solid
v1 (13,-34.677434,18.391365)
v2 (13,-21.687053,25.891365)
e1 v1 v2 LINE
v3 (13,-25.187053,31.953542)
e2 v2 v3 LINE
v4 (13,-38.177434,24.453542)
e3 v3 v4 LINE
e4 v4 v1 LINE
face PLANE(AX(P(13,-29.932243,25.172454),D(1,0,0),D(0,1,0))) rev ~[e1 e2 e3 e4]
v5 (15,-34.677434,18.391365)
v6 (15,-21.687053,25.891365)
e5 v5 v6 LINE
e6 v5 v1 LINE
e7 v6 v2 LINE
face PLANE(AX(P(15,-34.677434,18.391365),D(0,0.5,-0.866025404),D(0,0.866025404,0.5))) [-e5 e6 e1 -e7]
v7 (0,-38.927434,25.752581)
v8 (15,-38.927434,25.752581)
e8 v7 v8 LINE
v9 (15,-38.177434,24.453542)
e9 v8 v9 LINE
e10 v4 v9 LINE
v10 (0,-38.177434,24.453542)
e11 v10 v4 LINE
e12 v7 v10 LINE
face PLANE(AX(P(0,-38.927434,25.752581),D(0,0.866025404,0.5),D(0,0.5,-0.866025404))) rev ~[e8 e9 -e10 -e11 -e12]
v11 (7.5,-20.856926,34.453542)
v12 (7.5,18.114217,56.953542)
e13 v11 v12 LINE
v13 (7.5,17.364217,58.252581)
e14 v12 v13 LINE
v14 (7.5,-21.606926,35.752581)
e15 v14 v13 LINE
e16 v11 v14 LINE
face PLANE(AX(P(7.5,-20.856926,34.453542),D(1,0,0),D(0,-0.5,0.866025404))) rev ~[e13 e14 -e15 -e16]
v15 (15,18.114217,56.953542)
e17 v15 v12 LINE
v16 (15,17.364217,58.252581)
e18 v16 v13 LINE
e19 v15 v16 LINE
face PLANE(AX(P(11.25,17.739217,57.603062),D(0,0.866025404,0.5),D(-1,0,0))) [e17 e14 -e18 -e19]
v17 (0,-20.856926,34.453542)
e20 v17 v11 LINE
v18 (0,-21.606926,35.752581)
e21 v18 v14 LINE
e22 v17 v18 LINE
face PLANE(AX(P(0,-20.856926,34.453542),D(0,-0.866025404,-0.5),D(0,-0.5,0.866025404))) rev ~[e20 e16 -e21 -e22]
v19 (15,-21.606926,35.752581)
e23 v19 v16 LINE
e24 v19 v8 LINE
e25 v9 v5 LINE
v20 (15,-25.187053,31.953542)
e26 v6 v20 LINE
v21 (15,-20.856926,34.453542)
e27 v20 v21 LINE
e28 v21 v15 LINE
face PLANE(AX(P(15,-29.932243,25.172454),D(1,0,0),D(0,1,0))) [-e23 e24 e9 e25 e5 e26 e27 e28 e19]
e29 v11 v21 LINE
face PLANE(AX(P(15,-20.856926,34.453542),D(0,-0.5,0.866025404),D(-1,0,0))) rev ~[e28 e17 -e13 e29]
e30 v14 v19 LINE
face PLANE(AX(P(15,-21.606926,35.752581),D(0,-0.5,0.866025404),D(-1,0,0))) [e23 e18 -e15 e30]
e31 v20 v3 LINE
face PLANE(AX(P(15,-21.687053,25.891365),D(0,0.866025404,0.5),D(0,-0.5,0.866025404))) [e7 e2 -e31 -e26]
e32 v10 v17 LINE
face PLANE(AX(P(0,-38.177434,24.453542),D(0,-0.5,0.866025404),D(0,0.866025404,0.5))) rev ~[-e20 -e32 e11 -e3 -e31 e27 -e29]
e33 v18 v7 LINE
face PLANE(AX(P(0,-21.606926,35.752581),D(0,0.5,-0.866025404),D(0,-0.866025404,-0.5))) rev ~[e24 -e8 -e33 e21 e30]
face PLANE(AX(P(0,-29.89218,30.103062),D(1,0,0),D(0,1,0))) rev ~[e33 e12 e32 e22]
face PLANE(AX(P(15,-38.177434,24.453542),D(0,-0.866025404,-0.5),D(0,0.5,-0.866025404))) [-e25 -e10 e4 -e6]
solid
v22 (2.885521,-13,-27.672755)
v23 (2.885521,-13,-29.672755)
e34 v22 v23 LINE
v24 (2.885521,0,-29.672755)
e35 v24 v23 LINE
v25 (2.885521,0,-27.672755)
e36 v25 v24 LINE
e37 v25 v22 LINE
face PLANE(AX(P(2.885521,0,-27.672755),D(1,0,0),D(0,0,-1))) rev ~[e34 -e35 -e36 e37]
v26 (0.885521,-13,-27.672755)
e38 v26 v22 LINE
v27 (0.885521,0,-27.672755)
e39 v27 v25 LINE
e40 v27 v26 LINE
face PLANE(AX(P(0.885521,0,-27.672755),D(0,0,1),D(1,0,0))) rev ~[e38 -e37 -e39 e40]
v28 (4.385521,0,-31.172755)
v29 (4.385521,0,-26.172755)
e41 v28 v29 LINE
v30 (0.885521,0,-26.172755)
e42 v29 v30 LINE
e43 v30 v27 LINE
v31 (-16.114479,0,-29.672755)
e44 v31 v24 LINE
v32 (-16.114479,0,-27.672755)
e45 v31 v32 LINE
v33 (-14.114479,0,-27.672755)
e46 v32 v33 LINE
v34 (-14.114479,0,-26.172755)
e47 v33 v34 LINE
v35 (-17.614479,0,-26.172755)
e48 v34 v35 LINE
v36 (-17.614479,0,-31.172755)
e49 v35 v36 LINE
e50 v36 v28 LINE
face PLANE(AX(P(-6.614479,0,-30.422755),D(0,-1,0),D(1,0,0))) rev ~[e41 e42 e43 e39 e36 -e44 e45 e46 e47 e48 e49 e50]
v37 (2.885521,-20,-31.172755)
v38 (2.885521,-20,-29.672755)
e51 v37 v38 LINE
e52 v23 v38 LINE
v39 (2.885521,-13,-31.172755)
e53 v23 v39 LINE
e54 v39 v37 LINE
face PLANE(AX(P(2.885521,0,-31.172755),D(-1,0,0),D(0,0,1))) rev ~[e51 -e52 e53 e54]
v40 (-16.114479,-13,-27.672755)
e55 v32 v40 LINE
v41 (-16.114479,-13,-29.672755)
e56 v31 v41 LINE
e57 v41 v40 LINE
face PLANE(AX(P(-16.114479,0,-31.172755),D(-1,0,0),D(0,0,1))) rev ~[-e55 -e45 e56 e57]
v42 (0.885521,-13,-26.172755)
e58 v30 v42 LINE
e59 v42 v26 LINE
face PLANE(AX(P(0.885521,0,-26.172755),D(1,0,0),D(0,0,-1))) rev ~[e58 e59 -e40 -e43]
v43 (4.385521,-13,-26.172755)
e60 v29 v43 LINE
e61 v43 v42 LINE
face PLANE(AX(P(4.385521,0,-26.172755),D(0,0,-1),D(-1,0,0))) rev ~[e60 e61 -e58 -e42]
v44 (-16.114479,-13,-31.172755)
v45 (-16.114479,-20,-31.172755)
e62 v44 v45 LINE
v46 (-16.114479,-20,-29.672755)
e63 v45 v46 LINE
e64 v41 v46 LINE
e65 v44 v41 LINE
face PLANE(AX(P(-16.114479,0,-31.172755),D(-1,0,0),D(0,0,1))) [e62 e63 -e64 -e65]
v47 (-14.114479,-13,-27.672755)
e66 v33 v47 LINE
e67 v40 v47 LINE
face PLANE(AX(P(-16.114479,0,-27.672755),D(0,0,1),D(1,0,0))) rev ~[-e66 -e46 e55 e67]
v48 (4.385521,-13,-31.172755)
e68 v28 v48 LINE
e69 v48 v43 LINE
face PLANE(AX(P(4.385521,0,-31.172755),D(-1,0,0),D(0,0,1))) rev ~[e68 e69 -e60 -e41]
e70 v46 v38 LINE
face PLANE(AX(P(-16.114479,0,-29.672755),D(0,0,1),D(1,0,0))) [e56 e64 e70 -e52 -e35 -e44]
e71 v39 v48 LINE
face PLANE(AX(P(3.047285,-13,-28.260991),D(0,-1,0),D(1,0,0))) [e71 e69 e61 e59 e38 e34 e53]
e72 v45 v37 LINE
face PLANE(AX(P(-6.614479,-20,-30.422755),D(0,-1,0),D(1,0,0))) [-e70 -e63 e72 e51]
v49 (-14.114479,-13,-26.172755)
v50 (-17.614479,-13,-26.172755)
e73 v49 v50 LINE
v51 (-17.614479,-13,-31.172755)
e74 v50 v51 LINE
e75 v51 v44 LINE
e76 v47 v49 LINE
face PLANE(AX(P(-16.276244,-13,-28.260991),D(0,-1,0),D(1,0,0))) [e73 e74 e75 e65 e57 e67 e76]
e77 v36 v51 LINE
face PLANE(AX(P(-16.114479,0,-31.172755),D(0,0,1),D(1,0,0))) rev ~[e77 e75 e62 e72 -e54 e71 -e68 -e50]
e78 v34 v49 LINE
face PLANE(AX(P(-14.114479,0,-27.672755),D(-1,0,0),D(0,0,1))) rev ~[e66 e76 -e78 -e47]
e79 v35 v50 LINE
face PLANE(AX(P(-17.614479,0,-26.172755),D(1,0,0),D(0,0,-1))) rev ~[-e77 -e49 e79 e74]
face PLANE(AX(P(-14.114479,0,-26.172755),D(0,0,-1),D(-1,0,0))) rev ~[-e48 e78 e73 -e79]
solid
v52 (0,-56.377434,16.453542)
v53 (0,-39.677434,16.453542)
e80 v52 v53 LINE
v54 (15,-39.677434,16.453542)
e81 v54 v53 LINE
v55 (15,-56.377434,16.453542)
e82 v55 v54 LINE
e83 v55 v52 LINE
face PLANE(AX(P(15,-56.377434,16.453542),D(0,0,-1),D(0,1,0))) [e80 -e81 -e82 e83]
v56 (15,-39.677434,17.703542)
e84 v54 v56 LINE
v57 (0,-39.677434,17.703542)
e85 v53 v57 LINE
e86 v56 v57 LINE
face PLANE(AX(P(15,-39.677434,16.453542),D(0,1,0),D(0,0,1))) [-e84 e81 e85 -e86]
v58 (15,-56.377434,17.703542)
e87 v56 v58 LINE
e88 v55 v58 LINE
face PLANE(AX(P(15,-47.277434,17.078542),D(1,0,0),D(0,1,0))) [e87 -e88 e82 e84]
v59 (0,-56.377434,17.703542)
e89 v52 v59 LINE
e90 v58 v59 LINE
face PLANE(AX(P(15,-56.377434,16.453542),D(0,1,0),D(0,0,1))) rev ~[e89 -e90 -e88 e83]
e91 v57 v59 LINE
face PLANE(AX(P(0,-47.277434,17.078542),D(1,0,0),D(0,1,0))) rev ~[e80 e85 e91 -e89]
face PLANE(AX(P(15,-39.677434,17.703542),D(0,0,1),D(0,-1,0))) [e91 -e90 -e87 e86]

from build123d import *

# Parameters (mm, degrees)
F1_DEPTH  = 13
F0_W      = 19
F0_H      = 1.5
F2_DEPTH  = 20
F4_DEPTH  = 15
F6_W      = 7.5
F6_H      = 1.5
F7_DEPTH  = 45
F8_W      = 15.2
F8_H      = 1.25
F8_W_2    = 1.5
F9_DEPTH  = 15
F11_DEPTH = 2


# Not quite as in the source:
# - a feature names something its author has since deleted; it is built from what else it names


with BuildPart() as f1:
    # F0 (on Front) → F1 (new body)
    with BuildSketch(Plane.XZ):
        Polygon((-16.114479475, -31.1727552094), (-16.114479475, -29.6727552094), (-16.114479475, -27.6727552094), (-14.114479475, -27.6727552094), (-14.114479475, -26.1727552094), (-17.614479475, -26.1727552094), (-17.614479475, -31.1727552094), align=None)
    extrude(amount=F1_DEPTH)



with BuildPart() as f1b:
    # F0 (on Front) → F1, piece 2 (new body)
    with BuildSketch(Plane.XZ):
        Polygon((2.885520525, -27.6727552094), (2.885520525, -29.6727552094), (2.885520525, -31.1727552094), (4.385520525, -31.1727552094), (4.385520525, -26.1727552094), (0.885520525, -26.1727552094), (0.885520525, -27.6727552094), align=None)
    extrude(amount=F1_DEPTH)


with BuildPart() as f1_1:
    add(f1.part)

    add(f1b.part)  # F2 merges F1b
    # F0 (on Front) → F2 (join)
    with BuildSketch(Plane.XZ):
        with Locations((-6.614479475, -30.4227552094)):
            Rectangle(F0_W, F0_H)
    extrude(amount=F2_DEPTH)


with BuildPart() as f4:
    # F3 (on Right) → F4 (new body)
    with BuildSketch(Plane.YZ):
        Polygon((-21.6069256863, -37.1474194041), (-38.927433762, -47.1474194041), (-38.177433762, -48.4464575097), (-20.8569256863, -38.4464575097), align=None)
    extrude(amount=F4_DEPTH)


with BuildPart() as f4_1:
    # F5: moved
    add(f4.part.moved(Location((0, 0, 72.9))))

    # F6 (on face) → F7 (join)
    with BuildSketch(Plane(origin=(0, -0.7238727413, -0.417928122), x_dir=(-1, 0, 0), z_dir=(0, 0.8660254038, 0.5))):
        with Locations((-11.25, 41.0161058901)):
            Rectangle(F6_W, F6_H)
    extrude(amount=F7_DEPTH)

    # F10 (on face) → F11 (join)
    with BuildSketch(Plane.YZ.offset(15)):
        Polygon((-25.1870527052, 31.9535424903), (-38.177433762, 24.4535424903), (-34.677433762, 18.3913646638), (-21.6870527052, 25.8913646638), align=None)
    extrude(amount=-F11_DEPTH)


with BuildPart() as f9:
    # F8 (on face) → F9 (new body)
    with BuildSketch(Plane.YZ.offset(15)):
        with Locations((-47.277433762, 17.0785424903)):
            Rectangle(F8_W, F8_H)
        with Locations((-55.627433762, 17.0785424903)):
            Rectangle(F8_W_2, F8_H)
    extrude(amount=-F9_DEPTH)


solid = Compound([f1_1.part, f4_1.part, f9.part])
